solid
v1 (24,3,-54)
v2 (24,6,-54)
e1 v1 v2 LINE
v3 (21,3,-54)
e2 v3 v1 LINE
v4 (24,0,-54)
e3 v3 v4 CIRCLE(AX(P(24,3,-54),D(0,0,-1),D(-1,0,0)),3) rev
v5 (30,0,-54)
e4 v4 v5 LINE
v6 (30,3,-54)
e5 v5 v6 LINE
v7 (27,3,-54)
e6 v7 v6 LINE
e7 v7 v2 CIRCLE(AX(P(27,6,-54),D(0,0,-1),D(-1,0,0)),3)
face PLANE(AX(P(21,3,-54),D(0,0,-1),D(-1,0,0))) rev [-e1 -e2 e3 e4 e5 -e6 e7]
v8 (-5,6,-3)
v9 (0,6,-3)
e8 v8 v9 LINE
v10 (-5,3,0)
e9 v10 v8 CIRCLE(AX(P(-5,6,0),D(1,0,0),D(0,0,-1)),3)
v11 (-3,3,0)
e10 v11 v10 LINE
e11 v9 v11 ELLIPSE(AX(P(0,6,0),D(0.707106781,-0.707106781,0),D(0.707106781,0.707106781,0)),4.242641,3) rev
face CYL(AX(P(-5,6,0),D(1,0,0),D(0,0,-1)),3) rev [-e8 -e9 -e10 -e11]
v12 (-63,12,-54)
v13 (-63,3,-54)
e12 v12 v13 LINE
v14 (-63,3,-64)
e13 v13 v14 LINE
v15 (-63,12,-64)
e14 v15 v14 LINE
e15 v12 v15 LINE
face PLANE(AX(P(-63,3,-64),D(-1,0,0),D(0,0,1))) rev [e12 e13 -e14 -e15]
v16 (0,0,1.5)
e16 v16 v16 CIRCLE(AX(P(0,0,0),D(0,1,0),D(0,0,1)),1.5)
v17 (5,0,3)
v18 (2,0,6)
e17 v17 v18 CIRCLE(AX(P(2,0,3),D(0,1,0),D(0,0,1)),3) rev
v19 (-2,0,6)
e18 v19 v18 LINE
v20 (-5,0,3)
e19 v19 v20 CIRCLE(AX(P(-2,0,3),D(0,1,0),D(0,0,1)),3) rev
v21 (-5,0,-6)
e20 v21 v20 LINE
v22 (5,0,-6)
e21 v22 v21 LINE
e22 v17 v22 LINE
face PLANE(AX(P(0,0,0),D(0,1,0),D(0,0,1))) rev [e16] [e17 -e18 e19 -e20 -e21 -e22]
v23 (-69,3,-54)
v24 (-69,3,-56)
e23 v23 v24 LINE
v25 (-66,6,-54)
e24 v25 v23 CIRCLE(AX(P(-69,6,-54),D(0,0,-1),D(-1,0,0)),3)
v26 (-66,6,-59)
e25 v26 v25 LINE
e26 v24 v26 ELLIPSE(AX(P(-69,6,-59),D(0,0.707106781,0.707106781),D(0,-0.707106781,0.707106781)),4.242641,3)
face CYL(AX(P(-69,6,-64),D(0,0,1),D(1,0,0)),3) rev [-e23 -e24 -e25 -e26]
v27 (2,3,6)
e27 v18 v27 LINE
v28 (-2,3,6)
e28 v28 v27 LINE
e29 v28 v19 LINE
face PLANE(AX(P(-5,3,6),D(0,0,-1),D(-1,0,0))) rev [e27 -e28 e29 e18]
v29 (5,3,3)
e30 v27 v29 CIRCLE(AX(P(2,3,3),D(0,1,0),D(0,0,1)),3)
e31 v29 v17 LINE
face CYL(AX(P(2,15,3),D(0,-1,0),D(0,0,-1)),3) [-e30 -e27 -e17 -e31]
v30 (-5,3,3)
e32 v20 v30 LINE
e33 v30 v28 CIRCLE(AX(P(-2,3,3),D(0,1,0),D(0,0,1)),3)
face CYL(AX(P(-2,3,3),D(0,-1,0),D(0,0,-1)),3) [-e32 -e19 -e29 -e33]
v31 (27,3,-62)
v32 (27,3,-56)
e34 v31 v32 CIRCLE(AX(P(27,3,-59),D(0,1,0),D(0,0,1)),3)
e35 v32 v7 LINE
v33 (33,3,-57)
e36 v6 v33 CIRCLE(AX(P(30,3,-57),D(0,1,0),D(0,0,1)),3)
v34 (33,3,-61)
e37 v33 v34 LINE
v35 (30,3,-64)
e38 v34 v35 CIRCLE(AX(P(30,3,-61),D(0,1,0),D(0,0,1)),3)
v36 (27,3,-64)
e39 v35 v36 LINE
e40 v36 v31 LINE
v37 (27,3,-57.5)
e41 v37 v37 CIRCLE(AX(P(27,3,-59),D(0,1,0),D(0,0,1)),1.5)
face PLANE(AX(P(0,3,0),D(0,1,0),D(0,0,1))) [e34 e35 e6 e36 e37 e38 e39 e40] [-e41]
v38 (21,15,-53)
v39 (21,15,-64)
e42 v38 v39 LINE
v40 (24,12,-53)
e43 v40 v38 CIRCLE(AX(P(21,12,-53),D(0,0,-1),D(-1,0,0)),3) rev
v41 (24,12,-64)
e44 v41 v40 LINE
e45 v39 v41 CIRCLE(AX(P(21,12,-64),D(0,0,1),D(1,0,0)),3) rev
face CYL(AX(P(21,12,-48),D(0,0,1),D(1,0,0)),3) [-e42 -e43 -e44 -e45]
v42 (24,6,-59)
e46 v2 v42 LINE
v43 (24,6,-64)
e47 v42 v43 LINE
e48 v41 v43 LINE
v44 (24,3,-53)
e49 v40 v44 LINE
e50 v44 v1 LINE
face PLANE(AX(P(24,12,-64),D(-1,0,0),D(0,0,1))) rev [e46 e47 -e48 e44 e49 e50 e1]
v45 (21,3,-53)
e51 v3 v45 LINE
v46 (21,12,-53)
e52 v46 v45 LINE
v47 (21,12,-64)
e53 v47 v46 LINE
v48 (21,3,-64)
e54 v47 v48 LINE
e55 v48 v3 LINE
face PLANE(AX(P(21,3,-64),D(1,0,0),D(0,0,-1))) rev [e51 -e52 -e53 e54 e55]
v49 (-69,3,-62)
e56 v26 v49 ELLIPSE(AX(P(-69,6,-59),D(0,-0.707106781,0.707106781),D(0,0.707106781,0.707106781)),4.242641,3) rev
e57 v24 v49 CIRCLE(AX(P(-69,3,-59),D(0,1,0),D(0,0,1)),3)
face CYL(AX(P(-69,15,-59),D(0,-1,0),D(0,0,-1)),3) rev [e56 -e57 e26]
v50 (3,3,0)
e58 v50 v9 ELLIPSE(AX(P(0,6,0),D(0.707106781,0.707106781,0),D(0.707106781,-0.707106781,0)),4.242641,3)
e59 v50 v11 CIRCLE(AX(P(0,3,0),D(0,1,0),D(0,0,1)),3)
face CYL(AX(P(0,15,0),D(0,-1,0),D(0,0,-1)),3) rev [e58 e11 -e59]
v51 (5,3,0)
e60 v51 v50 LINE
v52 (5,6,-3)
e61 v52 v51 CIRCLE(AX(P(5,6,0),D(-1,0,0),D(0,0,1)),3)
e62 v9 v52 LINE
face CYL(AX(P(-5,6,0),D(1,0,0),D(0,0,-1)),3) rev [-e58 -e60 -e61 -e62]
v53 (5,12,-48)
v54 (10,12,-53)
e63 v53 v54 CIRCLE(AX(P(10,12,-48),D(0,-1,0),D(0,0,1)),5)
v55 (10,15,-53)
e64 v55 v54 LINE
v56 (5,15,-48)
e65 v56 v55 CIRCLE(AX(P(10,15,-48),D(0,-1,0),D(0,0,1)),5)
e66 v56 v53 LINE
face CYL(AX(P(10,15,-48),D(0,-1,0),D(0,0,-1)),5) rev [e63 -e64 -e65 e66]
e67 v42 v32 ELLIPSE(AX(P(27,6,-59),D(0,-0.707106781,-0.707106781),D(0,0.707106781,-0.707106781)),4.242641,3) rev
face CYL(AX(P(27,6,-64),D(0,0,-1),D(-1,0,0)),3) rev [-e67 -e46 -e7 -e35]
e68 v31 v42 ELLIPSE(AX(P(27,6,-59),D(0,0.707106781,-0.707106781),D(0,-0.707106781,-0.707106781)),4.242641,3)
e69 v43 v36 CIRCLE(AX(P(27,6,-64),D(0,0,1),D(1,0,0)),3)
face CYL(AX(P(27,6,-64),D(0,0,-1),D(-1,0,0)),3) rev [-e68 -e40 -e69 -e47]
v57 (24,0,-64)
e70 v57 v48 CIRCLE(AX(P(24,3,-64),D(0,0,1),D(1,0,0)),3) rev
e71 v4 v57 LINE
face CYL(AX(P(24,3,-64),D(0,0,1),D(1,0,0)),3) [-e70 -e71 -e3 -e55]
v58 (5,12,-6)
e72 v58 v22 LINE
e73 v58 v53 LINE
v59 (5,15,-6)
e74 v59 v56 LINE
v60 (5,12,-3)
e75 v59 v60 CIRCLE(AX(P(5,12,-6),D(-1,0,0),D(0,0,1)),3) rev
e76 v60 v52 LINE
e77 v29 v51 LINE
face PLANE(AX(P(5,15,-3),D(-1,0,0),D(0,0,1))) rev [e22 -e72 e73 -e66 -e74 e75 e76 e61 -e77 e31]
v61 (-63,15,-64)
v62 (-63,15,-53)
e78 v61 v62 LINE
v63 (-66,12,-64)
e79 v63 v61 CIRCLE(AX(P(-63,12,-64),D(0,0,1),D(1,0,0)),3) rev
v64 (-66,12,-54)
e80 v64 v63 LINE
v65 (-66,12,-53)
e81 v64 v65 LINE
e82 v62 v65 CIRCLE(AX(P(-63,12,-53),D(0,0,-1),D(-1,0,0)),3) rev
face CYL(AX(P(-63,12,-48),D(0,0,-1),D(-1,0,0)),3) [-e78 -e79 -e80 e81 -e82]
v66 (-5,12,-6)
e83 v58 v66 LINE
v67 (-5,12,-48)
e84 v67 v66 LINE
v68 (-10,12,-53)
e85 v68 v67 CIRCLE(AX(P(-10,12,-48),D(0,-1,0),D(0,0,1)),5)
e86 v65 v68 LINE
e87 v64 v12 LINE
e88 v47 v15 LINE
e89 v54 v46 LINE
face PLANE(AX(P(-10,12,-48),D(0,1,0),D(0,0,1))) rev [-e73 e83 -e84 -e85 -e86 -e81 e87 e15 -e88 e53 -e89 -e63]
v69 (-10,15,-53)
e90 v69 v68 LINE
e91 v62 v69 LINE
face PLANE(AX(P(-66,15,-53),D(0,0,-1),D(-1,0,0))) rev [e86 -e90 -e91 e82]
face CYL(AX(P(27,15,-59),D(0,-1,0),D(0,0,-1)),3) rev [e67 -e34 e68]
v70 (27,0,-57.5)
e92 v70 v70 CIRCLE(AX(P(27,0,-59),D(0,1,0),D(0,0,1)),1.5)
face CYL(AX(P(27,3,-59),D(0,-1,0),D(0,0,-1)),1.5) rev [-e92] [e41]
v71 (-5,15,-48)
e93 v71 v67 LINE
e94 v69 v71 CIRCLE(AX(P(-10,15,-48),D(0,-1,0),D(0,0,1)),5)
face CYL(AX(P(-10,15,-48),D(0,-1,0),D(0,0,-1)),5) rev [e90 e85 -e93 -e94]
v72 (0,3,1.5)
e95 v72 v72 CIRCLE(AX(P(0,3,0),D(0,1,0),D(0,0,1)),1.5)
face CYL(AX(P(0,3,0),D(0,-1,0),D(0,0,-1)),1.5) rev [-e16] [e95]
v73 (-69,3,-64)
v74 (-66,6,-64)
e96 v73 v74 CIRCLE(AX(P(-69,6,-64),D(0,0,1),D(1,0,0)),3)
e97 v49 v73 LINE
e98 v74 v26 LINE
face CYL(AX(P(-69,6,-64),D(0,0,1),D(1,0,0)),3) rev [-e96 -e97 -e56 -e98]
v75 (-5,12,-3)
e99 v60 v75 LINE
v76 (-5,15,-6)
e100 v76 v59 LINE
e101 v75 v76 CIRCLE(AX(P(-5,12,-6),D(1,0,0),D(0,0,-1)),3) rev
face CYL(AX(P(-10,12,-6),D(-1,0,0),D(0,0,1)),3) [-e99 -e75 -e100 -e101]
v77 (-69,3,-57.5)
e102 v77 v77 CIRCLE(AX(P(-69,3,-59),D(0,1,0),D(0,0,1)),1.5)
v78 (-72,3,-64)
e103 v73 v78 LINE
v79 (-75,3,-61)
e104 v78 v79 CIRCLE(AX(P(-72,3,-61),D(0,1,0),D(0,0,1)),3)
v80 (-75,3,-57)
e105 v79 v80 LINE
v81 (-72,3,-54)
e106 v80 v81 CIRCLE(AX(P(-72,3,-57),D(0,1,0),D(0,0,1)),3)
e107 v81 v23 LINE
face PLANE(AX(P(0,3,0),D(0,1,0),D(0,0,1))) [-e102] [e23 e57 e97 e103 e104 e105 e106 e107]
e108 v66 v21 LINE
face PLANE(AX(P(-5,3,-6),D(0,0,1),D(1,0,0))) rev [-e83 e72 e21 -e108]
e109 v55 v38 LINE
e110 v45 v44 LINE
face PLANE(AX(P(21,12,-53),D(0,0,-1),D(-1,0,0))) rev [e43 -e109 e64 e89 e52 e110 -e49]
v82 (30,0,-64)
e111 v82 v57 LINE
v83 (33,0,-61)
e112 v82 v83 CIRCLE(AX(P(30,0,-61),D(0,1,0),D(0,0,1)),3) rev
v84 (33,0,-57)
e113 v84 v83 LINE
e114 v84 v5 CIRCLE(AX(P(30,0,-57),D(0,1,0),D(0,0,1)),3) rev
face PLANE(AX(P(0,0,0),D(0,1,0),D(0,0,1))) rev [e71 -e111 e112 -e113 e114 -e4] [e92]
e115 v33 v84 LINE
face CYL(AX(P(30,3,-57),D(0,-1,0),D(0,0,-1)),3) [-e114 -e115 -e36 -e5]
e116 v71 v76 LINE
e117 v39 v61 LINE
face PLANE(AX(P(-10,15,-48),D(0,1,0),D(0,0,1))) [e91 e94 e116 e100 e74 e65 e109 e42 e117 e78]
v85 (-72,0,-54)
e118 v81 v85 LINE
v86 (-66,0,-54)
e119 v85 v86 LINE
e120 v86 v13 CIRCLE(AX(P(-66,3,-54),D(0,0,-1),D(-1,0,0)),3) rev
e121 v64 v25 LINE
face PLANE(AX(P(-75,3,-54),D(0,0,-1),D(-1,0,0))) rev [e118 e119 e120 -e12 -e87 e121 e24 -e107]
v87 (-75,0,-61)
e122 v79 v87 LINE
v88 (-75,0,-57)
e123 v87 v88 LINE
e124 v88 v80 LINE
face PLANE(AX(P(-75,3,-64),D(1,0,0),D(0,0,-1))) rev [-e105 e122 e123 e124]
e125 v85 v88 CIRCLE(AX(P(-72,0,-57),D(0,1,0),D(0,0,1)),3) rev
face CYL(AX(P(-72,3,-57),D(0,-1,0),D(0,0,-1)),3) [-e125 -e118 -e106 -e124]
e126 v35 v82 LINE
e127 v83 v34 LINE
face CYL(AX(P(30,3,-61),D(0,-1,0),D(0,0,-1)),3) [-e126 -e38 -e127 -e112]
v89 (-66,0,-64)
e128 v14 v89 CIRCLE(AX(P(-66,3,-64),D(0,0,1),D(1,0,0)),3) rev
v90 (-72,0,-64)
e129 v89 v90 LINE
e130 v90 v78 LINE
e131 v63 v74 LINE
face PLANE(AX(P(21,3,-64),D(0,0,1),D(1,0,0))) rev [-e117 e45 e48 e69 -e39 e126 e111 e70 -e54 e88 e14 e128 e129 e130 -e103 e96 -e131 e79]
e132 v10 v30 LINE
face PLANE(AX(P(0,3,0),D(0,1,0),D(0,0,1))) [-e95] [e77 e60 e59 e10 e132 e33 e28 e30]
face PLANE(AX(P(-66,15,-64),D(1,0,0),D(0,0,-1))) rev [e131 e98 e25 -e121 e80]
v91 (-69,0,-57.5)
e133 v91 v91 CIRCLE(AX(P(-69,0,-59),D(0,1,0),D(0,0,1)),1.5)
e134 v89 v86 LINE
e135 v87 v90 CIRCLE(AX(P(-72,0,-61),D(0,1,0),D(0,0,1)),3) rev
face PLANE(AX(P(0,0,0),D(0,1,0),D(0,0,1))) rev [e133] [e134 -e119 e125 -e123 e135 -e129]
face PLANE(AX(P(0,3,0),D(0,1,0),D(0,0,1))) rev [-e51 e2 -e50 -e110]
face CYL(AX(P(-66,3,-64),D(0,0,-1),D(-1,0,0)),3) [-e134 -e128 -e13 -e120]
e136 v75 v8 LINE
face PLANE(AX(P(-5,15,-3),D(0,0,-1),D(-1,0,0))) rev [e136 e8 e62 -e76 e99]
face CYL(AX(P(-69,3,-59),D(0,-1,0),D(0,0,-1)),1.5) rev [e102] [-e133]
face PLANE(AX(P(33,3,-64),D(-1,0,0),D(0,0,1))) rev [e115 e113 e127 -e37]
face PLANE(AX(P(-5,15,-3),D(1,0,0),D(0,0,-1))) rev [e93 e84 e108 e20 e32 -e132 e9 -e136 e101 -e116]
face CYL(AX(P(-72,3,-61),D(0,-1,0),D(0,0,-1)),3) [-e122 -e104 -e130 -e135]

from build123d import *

# Parameters (mm, degrees)
SKETCH1_W               = 12
SKETCH1_H               = 10
SKETCH1_R               = 1.5
SCREW_TABS_DEPTH        = 3
SCREW_TABS_2_DEPTH      = 3
SKETCH1_W_2             = 10
SKETCH1_H_2             = 12
SCREW_TABS_3_DEPTH      = 3
SKETCH2_W               = 3
SKETCH2_H               = 10
SKETCH2_H_2             = 11
SKETCH2_W_2             = 10
SKETCH2_H_3             = 3
VERTICAL_EXTRUDE_DEPTH  = 9
TOP_BRACKET_DEPTH       = 3
F_3MM_EDGE_ROUNDING_R   = 3
SKETCH4_R               = 3
SCREWHOLE_CLEARUP_DEPTH = 100.322706431


with BuildPart() as part:
    # Sketch1 → Screw tabs (new body)
    with BuildSketch(Plane(origin=(0, 0, 0), x_dir=(1, 0, 0), z_dir=(0, 1, 0))):
        with Locations((-69, 59)):
            Rectangle(SKETCH1_W, SKETCH1_H)
        with Locations(Location((-69, 59, 0), (0, 0, 270))):
            Circle(SKETCH1_R, mode=Mode.SUBTRACT)
    extrude(amount=SCREW_TABS_DEPTH)



with BuildPart() as body_2:
    # Sketch1 → Screw tabs 2 (new body)
    with BuildSketch(Plane(origin=(0, 0, 0), x_dir=(1, 0, 0), z_dir=(0, 1, 0))):
        with Locations((27, 59)):
            Rectangle(SKETCH1_W, SKETCH1_H)
        with Locations(Location((27, 59, 0), (0, 0, 270))):
            Circle(SKETCH1_R, mode=Mode.SUBTRACT)
    extrude(amount=SCREW_TABS_2_DEPTH)


with BuildPart() as body_3:
    # Sketch1 → Screw tabs 3 (new body)
    with BuildSketch(Plane(origin=(0, 0, 0), x_dir=(1, 0, 0), z_dir=(0, 1, 0))):
        Rectangle(SKETCH1_W_2, SKETCH1_H_2)
        with Locations(Location((0, 0, 0), (0, 0, 270))):
            Circle(SKETCH1_R, mode=Mode.SUBTRACT)
    extrude(amount=SCREW_TABS_3_DEPTH)


with BuildPart() as part_1:
    add(part.part)

    add(body_2.part)  # Vertical extrude merges body 2

    add(body_3.part)  # Vertical extrude merges body 3
    # Sketch2 → Vertical extrude (add)
    with BuildSketch(Plane(origin=(0, 3, 0), x_dir=(1, 0, 0), z_dir=(0, 1, 0))):
        with Locations((-64.5, 59)):
            Rectangle(SKETCH2_W, SKETCH2_H)
        with Locations((22.5, 58.5)):
            Rectangle(SKETCH2_W, SKETCH2_H_2)
        with Locations((0, 4.5)):
            Rectangle(SKETCH2_W_2, SKETCH2_H_3)
    extrude(amount=VERTICAL_EXTRUDE_DEPTH)

    # Sketch3 → Top bracket (add)
    with BuildSketch(Plane(origin=(0, 12, 0), x_dir=(1, 0, 0), z_dir=(0, 1, 0))):
        with BuildLine():
            Line((-66, 64), (24, 64))
            Line((24, 64), (24, 53))
            Line((24, 53), (10, 53))
            ThreePointArc((10, 53), (6.464466094, 51.535533906), (5, 48))
            Line((5, 48), (5, 3))
            Line((5, 3), (-5, 3))
            Line((-5, 3), (-5, 48))
            ThreePointArc((-5, 48), (-6.464466094, 51.535533906), (-10, 53))
            Line((-10, 53), (-66, 53))
            Line((-66, 53), (-66, 64))
        make_face()
    extrude(amount=TOP_BRACKET_DEPTH)

    # 3mm edge rounding
    # the kernel refuses this fillet: 3 mm, written as the material it adds along each edge
    with BuildSketch(Plane(origin=(24, 3, -64), x_dir=(1, 0, 0), z_dir=(0, 0, 1))) as f_3mm_edge_rounding_piece_1_section:
        with BuildLine():
            CenterArc((F_3MM_EDGE_ROUNDING_R, F_3MM_EDGE_ROUNDING_R), F_3MM_EDGE_ROUNDING_R, 180, 90)
            Line((0, F_3MM_EDGE_ROUNDING_R), (0, 0))
            Line((0, 0), (F_3MM_EDGE_ROUNDING_R, 0))
        make_face()
    f_3mm_edge_rounding_piece_1 = extrude(amount=10, mode=Mode.PRIVATE)
    f_3mm_edge_rounding_piece_1 = f_3mm_edge_rounding_piece_1 - Plane(origin=(27, 3.680423694, -59), x_dir=(0, 0, 1), z_dir=(0, -1, 0)) * Cylinder(1.5, 33, mode=Mode.PRIVATE)
    add(f_3mm_edge_rounding_piece_1)
    with BuildSketch(Plane(origin=(5, 3, -3), x_dir=(0, 0, 1), z_dir=(-1, 0, 0))) as f_3mm_edge_rounding_piece_2_section:
        with BuildLine():
            CenterArc((F_3MM_EDGE_ROUNDING_R, F_3MM_EDGE_ROUNDING_R), F_3MM_EDGE_ROUNDING_R, 180, 90)
            Line((0, F_3MM_EDGE_ROUNDING_R), (0, 0))
            Line((0, 0), (F_3MM_EDGE_ROUNDING_R, 0))
        make_face()
    f_3mm_edge_rounding_piece_2 = extrude(amount=10, mode=Mode.PRIVATE)
    f_3mm_edge_rounding_piece_2 = f_3mm_edge_rounding_piece_2 - Plane(origin=(0, 3.680423694, 0), x_dir=(0, 0, 1), z_dir=(0, -1, 0)) * Cylinder(1.5, 32, mode=Mode.PRIVATE)
    add(f_3mm_edge_rounding_piece_2)
    with BuildSketch(Plane(origin=(-66, 3, -64), x_dir=(0, 1, 0), z_dir=(0, 0, 1))) as f_3mm_edge_rounding_piece_3_section:
        with BuildLine():
            CenterArc((F_3MM_EDGE_ROUNDING_R, F_3MM_EDGE_ROUNDING_R), F_3MM_EDGE_ROUNDING_R, 180, 90)
            Line((0, F_3MM_EDGE_ROUNDING_R), (0, 0))
            Line((0, 0), (F_3MM_EDGE_ROUNDING_R, 0))
        make_face()
    f_3mm_edge_rounding_piece_3 = extrude(amount=10, mode=Mode.PRIVATE)
    f_3mm_edge_rounding_piece_3 = f_3mm_edge_rounding_piece_3 - Plane(origin=(-69, 3.680423205, -59), x_dir=(0, 0, 1), z_dir=(0, -1, 0)) * Cylinder(1.5, 32, mode=Mode.PRIVATE)
    add(f_3mm_edge_rounding_piece_3)
    # the kernel refuses this fillet: 3 mm, written as the material it takes off along each edge
    with BuildSketch(Plane(origin=(-63, 0, -71.5), x_dir=(0, 1, 0), z_dir=(0, 0, 1)), Plane(origin=(21, 0, -46.5), x_dir=(0, 1, 0), z_dir=(0, 0, -1))) as f_3mm_edge_rounding_2_piece_1:
        with BuildLine():
            CenterArc((F_3MM_EDGE_ROUNDING_R, F_3MM_EDGE_ROUNDING_R), F_3MM_EDGE_ROUNDING_R, 180, 90)
            Line((0, F_3MM_EDGE_ROUNDING_R), (0, 0))
            Line((0, 0), (F_3MM_EDGE_ROUNDING_R, 0))
        make_face()
    extrude(amount=25, mode=Mode.SUBTRACT)
    with BuildSketch(Plane(origin=(33, -7.5, -64), x_dir=(-1, 0, 0), z_dir=(0, 1, 0)), Plane(origin=(5, -7.5, 6), x_dir=(0, 0, -1), z_dir=(0, 1, 0)), Plane(origin=(-75, -7.5, -54), x_dir=(1, 0, 0), z_dir=(0, 1, 0))) as f_3mm_edge_rounding_2_piece_2:
        with BuildLine():
            CenterArc((F_3MM_EDGE_ROUNDING_R, F_3MM_EDGE_ROUNDING_R), F_3MM_EDGE_ROUNDING_R, 180, 90)
            Line((0, F_3MM_EDGE_ROUNDING_R), (0, 0))
            Line((0, 0), (F_3MM_EDGE_ROUNDING_R, 0))
        make_face()
    extrude(amount=18, mode=Mode.SUBTRACT)
    with BuildSketch(Plane(origin=(33, -7.5, -54), x_dir=(-1, 0, 0), z_dir=(0, 1, 0)), Plane(origin=(-5, -7.5, 6), x_dir=(0, 0, -1), z_dir=(0, 1, 0)), Plane(origin=(-75, -7.5, -64), x_dir=(1, 0, 0), z_dir=(0, 1, 0))) as f_3mm_edge_rounding_2_piece_3:
        with BuildLine():
            CenterArc((F_3MM_EDGE_ROUNDING_R, -F_3MM_EDGE_ROUNDING_R), F_3MM_EDGE_ROUNDING_R, 90, 90)
            Line((0, -F_3MM_EDGE_ROUNDING_R), (0, 0))
            Line((0, 0), (F_3MM_EDGE_ROUNDING_R, 0))
        make_face()
    extrude(amount=18, mode=Mode.SUBTRACT)
    with BuildSketch(Plane(origin=(24, 15, -71.5), x_dir=(-1, 0, 0), z_dir=(0, 0, 1)), Plane(origin=(-66, 15, -45.5), x_dir=(1, 0, 0), z_dir=(0, 0, -1))) as f_3mm_edge_rounding_2_piece_4:
        with BuildLine():
            CenterArc((F_3MM_EDGE_ROUNDING_R, F_3MM_EDGE_ROUNDING_R), F_3MM_EDGE_ROUNDING_R, 180, 90)
            Line((0, F_3MM_EDGE_ROUNDING_R), (0, 0))
            Line((0, 0), (F_3MM_EDGE_ROUNDING_R, 0))
        make_face()
    extrude(amount=26, mode=Mode.SUBTRACT)
    with BuildSketch(Plane(origin=(12.5, 15, -3), x_dir=(0, -1, 0), z_dir=(-1, 0, 0))) as f_3mm_edge_rounding_2_piece_5:
        with BuildLine():
            CenterArc((F_3MM_EDGE_ROUNDING_R, -F_3MM_EDGE_ROUNDING_R), F_3MM_EDGE_ROUNDING_R, 90, 90)
            Line((0, -F_3MM_EDGE_ROUNDING_R), (0, 0))
            Line((0, 0), (F_3MM_EDGE_ROUNDING_R, 0))
        make_face()
    extrude(amount=25, mode=Mode.SUBTRACT)

    # Sketch4 → Screwhole clearup (cut, through all)
    with BuildSketch(Plane(origin=(0, 3, 0), x_dir=(1, 0, 0), z_dir=(0, 1, 0))):
        with Locations((-69, 59)):
            Circle(SKETCH4_R)
        Circle(SKETCH4_R)
        with Locations((27, 59)):
            Circle(SKETCH4_R)
    extrude(amount=SCREWHOLE_CLEARUP_DEPTH, mode=Mode.SUBTRACT)


solid = part_1.part
